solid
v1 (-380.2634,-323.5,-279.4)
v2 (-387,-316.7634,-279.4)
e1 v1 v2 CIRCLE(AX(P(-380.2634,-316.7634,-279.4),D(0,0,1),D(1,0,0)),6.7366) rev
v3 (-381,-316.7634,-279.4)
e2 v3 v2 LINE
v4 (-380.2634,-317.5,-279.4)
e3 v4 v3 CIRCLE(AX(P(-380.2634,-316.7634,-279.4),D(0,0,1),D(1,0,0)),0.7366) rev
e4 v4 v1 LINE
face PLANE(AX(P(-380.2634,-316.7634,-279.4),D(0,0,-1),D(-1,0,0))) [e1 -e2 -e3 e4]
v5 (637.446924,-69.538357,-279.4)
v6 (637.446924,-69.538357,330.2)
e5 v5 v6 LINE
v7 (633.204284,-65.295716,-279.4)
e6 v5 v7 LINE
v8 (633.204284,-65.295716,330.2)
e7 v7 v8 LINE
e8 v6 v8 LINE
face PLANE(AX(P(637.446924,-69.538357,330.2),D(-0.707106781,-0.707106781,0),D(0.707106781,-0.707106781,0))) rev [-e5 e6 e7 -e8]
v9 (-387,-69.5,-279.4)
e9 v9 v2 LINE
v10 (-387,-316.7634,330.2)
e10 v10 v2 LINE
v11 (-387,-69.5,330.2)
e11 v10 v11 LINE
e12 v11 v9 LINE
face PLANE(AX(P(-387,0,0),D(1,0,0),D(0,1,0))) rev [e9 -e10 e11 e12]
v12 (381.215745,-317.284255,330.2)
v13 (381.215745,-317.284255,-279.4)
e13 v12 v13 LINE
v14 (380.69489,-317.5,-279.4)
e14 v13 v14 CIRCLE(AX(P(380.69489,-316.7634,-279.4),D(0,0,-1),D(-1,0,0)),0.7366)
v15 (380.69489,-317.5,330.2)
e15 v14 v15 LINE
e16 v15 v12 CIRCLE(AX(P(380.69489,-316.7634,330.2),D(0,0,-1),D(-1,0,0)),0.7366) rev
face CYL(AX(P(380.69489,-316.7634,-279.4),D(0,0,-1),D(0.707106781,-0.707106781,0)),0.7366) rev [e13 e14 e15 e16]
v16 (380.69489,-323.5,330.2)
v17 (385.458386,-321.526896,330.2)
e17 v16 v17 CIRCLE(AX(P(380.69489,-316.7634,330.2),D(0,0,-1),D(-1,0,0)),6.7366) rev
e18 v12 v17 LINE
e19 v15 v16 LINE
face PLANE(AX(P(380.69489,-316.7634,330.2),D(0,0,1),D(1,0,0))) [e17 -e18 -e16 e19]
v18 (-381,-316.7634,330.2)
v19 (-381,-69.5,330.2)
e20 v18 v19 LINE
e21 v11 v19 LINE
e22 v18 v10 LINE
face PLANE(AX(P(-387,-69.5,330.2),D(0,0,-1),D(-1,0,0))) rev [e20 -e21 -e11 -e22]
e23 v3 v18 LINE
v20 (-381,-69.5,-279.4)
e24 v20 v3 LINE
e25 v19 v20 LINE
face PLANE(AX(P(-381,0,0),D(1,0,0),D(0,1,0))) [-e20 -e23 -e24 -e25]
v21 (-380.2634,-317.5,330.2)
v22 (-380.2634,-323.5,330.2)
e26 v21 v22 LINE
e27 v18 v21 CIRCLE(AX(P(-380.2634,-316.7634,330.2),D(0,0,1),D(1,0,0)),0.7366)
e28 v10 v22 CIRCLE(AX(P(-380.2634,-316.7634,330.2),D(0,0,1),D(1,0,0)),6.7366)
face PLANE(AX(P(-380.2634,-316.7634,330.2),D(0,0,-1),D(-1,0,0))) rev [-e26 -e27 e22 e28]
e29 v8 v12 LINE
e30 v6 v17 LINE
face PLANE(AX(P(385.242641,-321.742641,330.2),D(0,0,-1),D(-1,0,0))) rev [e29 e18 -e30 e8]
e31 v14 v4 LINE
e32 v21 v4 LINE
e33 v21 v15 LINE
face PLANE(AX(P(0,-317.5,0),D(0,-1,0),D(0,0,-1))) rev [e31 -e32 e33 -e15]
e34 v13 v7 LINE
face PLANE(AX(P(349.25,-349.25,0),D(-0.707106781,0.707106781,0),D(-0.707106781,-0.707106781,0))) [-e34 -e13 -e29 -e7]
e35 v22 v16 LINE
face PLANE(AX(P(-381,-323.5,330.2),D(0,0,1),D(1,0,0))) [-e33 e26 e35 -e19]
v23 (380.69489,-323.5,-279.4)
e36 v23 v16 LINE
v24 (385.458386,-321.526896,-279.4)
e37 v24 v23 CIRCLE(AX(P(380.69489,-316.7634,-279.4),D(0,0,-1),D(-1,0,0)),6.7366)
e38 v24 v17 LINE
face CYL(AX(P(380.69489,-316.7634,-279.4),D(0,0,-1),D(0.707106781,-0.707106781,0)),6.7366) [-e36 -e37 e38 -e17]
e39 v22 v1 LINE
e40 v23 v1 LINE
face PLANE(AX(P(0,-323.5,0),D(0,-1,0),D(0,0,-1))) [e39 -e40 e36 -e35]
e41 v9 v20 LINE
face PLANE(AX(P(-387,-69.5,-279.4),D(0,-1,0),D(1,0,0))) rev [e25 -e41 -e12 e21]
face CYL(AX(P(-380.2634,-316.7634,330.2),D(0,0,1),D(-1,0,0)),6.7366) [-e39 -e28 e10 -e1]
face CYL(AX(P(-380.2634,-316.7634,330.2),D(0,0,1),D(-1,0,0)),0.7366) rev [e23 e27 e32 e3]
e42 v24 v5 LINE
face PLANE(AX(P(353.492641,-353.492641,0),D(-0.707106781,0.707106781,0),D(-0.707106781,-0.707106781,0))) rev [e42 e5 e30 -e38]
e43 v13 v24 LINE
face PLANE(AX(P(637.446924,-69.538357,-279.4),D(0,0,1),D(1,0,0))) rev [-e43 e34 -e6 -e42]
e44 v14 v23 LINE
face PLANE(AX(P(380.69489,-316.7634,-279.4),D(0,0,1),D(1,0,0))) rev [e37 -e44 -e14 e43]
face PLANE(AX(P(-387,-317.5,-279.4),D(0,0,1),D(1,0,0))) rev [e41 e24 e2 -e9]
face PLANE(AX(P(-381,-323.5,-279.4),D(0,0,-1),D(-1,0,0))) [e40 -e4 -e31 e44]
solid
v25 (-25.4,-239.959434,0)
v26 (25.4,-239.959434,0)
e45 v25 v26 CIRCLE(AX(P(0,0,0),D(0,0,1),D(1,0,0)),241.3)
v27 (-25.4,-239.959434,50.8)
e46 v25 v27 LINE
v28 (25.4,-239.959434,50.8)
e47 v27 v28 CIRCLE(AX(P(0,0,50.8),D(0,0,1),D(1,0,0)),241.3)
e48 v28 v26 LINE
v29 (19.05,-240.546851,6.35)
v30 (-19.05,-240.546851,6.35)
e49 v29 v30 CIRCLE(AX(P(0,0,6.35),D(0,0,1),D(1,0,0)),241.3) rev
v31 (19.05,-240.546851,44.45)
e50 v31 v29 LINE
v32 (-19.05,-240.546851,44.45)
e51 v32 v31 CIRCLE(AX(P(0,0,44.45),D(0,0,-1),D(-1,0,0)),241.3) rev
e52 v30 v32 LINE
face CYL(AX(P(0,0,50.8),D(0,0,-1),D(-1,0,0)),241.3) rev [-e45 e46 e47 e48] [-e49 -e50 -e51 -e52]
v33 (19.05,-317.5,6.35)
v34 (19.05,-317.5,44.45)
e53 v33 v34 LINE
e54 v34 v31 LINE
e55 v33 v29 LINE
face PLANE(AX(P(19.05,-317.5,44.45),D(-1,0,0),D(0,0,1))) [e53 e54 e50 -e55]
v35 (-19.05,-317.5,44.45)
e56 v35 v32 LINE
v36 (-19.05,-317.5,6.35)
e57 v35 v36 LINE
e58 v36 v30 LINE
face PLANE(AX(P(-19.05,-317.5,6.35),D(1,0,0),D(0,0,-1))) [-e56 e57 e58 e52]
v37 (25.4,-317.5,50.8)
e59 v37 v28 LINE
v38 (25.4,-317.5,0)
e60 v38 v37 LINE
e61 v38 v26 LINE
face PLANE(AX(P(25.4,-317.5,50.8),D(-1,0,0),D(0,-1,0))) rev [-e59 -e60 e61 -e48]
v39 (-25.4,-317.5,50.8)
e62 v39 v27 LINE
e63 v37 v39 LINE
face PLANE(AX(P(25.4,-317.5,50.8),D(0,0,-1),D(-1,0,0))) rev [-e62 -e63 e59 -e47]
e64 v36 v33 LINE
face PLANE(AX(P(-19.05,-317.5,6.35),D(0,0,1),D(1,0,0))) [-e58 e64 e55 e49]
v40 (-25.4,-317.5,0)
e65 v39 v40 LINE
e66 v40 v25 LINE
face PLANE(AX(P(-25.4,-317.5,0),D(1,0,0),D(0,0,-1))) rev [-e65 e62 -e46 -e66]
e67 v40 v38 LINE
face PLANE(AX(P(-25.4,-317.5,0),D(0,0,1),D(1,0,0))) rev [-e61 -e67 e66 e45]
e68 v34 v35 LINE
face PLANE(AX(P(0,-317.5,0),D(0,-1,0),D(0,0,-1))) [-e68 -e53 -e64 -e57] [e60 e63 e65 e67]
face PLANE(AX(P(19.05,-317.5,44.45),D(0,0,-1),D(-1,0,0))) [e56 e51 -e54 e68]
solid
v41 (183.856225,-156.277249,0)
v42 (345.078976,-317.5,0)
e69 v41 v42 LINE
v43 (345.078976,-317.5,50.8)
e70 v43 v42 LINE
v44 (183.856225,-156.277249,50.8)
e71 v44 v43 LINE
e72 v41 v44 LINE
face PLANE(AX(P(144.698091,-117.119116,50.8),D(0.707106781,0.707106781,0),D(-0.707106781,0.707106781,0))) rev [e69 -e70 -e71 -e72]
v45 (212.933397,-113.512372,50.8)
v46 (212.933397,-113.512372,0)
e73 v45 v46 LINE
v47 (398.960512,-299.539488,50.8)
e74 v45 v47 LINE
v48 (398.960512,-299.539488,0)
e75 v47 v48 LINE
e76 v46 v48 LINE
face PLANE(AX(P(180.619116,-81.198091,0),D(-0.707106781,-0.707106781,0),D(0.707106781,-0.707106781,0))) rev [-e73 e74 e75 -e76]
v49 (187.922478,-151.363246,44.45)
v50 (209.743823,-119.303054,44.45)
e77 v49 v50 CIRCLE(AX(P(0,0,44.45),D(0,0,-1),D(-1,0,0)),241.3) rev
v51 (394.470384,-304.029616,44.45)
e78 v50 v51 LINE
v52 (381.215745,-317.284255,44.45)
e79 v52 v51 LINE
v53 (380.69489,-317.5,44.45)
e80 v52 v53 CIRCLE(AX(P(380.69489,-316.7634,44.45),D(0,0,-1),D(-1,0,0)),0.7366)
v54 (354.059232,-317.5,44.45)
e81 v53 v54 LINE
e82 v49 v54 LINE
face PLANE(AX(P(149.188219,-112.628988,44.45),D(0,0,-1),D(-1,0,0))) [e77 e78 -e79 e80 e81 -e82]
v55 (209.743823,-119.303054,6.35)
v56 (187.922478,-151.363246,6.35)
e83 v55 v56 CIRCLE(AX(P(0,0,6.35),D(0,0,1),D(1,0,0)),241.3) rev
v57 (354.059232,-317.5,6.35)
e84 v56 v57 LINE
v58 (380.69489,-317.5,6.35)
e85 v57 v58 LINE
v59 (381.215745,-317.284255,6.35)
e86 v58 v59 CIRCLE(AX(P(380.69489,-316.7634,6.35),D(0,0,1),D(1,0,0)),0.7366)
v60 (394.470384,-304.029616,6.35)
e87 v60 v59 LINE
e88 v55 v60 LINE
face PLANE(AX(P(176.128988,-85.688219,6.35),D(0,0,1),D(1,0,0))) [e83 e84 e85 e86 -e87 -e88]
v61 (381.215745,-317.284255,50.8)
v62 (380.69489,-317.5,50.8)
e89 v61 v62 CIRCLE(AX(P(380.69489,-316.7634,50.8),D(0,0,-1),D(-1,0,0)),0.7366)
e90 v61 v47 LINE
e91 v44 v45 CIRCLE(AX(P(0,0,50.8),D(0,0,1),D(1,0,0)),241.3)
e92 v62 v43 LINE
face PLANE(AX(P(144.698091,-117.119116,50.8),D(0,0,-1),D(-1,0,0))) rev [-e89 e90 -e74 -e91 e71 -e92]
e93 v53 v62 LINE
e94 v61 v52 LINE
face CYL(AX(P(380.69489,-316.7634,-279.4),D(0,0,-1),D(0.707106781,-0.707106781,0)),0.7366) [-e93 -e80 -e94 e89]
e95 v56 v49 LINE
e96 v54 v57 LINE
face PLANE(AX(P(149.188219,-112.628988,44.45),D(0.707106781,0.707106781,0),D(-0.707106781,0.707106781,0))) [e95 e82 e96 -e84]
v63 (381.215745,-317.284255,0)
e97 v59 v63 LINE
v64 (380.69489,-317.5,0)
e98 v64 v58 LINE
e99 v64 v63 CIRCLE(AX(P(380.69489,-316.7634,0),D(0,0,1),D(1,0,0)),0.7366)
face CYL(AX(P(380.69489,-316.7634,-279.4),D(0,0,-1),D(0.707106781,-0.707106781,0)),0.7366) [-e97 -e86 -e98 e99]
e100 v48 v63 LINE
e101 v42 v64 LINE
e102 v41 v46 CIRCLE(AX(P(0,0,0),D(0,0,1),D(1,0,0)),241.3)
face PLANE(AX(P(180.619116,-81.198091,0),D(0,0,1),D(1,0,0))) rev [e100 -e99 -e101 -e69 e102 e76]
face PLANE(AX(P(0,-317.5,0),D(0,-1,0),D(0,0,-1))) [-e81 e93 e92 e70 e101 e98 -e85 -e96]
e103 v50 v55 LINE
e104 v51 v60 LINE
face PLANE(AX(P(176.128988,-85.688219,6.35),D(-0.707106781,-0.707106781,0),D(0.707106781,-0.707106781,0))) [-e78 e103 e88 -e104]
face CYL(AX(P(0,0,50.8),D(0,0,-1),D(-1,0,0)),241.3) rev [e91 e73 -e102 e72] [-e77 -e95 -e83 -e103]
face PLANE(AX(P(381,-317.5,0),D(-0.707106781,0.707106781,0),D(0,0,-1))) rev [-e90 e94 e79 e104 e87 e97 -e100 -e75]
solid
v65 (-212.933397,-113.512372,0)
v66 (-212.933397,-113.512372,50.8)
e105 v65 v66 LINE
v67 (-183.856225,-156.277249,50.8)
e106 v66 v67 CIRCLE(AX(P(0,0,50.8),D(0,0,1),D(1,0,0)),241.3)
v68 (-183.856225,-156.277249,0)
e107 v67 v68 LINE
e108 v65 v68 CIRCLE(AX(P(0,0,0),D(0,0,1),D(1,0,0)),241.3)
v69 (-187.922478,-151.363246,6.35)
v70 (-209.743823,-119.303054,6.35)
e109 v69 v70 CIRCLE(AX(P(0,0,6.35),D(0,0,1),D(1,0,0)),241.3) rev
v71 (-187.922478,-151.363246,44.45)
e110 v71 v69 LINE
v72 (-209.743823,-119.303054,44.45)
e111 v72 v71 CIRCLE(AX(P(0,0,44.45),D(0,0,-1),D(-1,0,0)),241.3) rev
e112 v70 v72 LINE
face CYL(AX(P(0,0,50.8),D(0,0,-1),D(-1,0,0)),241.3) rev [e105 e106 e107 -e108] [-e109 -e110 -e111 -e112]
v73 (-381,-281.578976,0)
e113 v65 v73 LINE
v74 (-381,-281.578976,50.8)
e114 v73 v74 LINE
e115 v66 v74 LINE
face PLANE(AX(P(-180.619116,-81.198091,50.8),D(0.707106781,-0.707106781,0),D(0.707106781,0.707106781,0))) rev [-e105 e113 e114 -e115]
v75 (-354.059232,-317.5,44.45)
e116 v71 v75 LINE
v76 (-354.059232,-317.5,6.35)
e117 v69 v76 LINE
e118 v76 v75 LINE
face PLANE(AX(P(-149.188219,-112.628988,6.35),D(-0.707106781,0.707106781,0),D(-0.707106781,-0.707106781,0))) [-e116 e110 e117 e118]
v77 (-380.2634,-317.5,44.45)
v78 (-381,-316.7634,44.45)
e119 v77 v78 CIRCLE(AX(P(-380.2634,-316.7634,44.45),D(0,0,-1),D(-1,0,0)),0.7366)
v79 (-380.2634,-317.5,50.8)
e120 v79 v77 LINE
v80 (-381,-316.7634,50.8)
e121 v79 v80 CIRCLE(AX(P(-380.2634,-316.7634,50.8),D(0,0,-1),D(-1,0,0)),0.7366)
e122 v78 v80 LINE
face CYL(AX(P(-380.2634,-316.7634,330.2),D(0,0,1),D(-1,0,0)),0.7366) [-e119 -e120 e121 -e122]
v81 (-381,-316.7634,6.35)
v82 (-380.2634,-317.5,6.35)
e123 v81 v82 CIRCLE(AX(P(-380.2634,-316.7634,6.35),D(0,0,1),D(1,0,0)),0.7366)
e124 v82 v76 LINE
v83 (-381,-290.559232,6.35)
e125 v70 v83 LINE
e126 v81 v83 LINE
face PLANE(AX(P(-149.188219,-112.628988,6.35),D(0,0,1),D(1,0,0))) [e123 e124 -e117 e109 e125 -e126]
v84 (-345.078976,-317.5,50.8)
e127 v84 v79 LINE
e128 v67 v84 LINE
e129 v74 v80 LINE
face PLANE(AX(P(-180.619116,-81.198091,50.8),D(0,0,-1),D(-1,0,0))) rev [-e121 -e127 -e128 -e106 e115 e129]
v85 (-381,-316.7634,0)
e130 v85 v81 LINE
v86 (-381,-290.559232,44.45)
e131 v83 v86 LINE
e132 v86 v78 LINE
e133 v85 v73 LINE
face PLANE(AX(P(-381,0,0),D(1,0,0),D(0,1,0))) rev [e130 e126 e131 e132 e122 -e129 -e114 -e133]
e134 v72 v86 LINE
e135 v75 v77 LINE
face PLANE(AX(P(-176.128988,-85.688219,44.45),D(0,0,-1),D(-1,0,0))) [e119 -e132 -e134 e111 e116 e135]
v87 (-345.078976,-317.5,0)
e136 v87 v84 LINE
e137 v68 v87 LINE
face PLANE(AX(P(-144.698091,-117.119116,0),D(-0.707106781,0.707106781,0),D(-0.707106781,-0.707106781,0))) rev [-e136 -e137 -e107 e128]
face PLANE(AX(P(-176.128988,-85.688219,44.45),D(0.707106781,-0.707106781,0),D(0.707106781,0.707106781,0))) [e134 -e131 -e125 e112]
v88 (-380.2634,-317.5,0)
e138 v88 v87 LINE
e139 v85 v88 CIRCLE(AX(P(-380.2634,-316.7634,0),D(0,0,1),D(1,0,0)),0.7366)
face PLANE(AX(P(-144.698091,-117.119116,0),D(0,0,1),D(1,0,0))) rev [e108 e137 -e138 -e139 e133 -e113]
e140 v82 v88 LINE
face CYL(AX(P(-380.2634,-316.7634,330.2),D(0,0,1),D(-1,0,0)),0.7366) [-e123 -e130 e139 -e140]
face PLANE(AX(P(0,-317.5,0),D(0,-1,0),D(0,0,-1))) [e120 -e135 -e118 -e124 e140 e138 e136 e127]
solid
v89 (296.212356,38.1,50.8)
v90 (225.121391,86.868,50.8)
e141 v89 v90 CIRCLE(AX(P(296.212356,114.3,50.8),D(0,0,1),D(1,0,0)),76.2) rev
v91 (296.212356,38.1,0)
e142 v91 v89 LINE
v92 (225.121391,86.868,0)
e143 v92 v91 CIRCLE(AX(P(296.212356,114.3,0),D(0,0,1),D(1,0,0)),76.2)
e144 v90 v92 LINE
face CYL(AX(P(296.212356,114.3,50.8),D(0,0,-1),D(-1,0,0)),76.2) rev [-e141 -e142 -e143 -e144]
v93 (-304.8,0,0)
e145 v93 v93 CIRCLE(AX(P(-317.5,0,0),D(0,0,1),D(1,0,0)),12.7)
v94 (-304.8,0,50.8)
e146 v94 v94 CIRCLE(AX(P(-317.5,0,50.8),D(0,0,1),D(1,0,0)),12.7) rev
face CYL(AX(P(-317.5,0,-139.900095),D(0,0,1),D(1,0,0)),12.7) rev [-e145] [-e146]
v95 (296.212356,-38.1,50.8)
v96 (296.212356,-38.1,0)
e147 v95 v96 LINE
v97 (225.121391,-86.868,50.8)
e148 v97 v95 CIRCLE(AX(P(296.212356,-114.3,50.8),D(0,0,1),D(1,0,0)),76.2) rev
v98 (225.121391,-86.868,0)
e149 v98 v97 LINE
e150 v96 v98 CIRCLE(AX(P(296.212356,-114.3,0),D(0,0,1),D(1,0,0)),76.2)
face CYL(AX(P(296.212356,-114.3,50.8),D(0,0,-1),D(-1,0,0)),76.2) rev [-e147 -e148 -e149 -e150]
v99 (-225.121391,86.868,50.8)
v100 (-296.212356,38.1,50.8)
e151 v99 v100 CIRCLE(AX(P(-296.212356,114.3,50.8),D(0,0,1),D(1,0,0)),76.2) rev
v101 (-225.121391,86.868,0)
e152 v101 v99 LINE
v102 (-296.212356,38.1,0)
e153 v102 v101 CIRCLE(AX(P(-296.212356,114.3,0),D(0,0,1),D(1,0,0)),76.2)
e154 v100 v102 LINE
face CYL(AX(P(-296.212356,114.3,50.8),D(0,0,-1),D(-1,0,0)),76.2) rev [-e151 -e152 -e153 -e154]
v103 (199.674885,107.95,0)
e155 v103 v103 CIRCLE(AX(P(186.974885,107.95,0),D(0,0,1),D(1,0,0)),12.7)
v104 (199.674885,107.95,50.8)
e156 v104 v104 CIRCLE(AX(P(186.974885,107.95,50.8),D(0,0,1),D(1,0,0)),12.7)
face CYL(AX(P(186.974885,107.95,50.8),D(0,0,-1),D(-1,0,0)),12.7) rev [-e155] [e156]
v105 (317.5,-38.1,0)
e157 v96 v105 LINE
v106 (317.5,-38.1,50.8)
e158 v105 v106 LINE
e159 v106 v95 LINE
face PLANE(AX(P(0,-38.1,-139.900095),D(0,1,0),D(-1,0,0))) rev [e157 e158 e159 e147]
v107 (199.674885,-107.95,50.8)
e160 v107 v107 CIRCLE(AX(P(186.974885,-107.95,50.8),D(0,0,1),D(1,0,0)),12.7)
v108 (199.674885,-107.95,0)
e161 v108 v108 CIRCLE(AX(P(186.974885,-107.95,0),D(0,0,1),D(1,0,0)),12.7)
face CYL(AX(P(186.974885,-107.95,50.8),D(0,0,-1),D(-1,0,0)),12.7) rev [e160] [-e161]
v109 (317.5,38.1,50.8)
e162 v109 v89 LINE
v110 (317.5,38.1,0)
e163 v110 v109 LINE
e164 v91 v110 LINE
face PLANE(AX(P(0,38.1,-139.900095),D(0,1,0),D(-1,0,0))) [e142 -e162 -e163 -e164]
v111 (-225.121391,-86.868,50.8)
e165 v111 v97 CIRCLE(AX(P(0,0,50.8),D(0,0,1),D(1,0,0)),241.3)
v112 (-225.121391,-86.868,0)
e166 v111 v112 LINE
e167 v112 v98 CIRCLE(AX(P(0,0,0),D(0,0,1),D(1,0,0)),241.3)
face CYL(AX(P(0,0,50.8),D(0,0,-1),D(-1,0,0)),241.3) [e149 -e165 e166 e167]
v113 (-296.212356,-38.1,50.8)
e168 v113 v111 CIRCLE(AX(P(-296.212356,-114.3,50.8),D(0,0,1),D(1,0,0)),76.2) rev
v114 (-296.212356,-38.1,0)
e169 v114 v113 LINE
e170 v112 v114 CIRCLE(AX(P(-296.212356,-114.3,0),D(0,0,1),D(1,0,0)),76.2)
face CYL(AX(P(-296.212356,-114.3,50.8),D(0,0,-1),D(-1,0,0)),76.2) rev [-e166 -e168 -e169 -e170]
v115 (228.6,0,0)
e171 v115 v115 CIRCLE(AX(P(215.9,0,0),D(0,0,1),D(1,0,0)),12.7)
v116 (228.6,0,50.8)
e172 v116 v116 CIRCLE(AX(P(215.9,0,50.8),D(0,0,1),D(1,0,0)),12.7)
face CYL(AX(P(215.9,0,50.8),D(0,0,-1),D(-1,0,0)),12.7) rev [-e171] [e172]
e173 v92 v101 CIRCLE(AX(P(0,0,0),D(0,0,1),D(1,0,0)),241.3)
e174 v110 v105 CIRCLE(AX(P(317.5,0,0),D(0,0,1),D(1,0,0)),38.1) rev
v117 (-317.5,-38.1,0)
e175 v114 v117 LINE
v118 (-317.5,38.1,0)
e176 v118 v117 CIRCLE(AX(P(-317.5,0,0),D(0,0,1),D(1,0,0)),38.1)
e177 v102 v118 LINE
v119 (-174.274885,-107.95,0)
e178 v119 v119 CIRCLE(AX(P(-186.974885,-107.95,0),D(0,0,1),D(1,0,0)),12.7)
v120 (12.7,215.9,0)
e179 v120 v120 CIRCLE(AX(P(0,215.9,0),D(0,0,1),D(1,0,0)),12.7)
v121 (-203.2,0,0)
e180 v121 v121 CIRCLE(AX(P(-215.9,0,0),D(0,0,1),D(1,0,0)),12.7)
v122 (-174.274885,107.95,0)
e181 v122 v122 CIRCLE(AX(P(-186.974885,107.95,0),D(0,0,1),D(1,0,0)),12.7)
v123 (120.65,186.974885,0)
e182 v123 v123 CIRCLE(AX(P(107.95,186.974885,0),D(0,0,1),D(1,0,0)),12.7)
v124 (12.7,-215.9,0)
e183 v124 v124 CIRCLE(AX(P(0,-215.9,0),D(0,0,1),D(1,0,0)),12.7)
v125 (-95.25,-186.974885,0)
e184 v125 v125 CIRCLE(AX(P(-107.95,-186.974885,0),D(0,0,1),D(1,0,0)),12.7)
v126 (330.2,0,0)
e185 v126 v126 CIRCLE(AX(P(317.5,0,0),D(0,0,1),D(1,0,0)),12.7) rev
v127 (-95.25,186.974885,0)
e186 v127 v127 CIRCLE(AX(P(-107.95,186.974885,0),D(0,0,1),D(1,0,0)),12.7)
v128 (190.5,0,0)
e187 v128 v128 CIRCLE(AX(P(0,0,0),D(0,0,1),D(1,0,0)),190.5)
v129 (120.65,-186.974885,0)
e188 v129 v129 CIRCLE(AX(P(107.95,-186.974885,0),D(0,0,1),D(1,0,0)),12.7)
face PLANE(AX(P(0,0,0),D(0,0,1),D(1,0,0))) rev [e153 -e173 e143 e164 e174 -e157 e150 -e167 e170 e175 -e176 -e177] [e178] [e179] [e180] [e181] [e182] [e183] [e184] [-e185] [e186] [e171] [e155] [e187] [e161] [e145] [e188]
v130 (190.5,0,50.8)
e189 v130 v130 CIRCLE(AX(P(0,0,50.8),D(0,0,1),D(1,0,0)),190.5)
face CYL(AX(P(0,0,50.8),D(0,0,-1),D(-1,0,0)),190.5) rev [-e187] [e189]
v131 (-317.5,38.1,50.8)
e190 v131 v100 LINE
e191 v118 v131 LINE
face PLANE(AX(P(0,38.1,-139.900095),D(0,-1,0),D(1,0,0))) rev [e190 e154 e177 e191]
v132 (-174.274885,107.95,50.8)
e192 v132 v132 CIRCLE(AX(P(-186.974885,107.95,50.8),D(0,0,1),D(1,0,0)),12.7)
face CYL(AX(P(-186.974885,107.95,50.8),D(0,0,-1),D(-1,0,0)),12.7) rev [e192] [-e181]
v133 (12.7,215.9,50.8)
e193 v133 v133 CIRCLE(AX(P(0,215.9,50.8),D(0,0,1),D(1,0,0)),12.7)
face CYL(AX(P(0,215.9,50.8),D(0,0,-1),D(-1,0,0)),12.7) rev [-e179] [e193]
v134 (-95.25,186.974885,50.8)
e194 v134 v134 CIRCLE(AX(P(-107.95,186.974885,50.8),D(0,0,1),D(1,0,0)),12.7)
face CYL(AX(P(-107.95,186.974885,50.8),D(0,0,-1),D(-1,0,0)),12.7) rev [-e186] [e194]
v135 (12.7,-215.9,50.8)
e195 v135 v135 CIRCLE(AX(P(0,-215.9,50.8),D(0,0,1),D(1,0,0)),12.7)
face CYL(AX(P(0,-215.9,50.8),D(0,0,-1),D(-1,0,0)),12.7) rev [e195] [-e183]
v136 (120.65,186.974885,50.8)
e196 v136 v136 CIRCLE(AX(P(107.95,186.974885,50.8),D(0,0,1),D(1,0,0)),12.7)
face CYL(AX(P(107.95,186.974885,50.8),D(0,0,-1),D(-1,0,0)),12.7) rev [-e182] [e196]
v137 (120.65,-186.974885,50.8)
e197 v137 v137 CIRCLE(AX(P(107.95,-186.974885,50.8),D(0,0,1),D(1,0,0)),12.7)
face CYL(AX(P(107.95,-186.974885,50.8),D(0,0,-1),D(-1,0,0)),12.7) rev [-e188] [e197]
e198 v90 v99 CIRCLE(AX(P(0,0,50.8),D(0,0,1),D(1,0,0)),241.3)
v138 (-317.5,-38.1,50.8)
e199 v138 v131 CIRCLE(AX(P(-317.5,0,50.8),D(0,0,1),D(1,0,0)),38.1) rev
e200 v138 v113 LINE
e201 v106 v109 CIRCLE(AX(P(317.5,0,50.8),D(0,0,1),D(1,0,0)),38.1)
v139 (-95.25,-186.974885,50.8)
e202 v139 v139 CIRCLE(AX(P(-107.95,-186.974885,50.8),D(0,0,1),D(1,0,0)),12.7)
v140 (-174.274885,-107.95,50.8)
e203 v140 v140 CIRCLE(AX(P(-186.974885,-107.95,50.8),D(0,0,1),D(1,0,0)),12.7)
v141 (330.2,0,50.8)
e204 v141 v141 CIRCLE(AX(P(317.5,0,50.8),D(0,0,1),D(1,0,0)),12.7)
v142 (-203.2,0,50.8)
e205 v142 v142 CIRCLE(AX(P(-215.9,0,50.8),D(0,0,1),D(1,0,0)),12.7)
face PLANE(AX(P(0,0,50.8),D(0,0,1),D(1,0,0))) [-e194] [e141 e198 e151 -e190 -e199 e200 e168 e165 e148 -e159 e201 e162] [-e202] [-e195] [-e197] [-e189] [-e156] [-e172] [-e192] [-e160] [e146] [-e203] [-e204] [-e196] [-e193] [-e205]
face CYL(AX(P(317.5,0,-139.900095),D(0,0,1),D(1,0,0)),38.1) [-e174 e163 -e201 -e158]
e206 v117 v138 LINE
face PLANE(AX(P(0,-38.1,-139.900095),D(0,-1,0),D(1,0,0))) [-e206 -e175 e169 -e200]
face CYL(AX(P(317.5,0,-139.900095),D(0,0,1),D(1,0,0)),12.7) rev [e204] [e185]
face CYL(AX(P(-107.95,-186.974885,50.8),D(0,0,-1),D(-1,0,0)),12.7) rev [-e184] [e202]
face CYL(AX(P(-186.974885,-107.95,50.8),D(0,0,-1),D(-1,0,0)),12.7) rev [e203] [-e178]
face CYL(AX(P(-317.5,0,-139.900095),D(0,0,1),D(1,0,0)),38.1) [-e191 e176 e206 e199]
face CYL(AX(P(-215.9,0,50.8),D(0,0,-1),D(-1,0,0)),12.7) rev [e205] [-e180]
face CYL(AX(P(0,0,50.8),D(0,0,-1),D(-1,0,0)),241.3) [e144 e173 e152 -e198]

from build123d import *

# Parameters (mm, degrees)
SKETCH1_R                                      = 241.3
SKETCH1_R_2                                    = 190.5
SKETCH1_R_3                                    = 12.7
BOSS_EXTRUDE1_DEPTH                            = 50.8
SKETCH18_W                                     = 50.8
SKETCH18_H                                     = 50.8
SKETCH18_W_2                                   = 38.1
SKETCH18_H_2                                   = 38.1
AL_TUBE_SQUARE_AL_TUBE_2_SQR_X_0_25_WALL_DEPTH = 127
SKETCH18_ON_SEGMENT_2_W                        = 50.8
SKETCH18_ON_SEGMENT_2_H                        = 50.8
SKETCH18_ON_SEGMENT_2_W_2                      = 38.1
SKETCH18_ON_SEGMENT_2_H_2                      = 38.1
AL_TUBE_SQUARE_AL_TUBE_2_SQR_X_0_25_2_DEPTH    = 308.781363997
SKETCH18_ON_SEGMENT_3_W                        = 50.8
SKETCH18_ON_SEGMENT_3_H                        = 50.8
SKETCH18_ON_SEGMENT_3_W_2                      = 38.1
SKETCH18_ON_SEGMENT_3_H_2                      = 38.1
AL_TUBE_SQUARE_AL_TUBE_2_SQR_X_0_25_3_DEPTH    = 308.781363997
INDENT1_DEPTH                                  = 50.8
INDENT1_2_DEPTH                                = 50.8
INDENT1_3_DEPTH                                = 6.35
INDENT1_START                                  = 44.45
INDENT1_4_DEPTH                                = 6.35
INDENT1_5_OUTLINE_R                            = 12.7
INDENT1_5_DEPTH                                = 6.35
INDENT1_6_OUTLINE_R                            = 12.7
INDENT1_6_DEPTH                                = 6.35
INDENT1_START_2                                = 6.35
INDENT1_7_DEPTH                                = 38.1
INDENT2_DEPTH                                  = 50.8
INDENT2_START                                  = 44.45
INDENT2_2_OUTLINE_R                            = 12.7
INDENT2_2_DEPTH                                = 6.35
INDENT2_3_OUTLINE_R                            = 12.7
INDENT2_3_DEPTH                                = 6.35
INDENT3_DEPTH                                  = 50.8
INDENT3_2_OUTLINE_R                            = 12.7
INDENT3_2_DEPTH                                = 6.35
INDENT3_START                                  = 44.45
INDENT3_3_OUTLINE_R                            = 12.7
INDENT3_3_DEPTH                                = 6.35
INDENT3_START_2                                = 6.35
INDENT3_4_DEPTH                                = 38.1
INDENT3_5_DEPTH                                = 50.8
INDENT3_6_DEPTH                                = 6.35
INDENT3_7_DEPTH                                = 6.35
SKETCH19_W                                     = 762
SKETCH19_H                                     = 609.6
BASE_FLANGE1_DEPTH                             = 6
EDGE_FLANGE1_STRIP_CUT_DEPTH                   = 609.6
EDGE_FLANGE1_DEPTH                             = 609.6
EDGE_FLANGE2_STRIP_W                           = 25.4732
EDGE_FLANGE2_STRIP_H                           = 6
EDGE_FLANGE2_STRIP_CUT_DEPTH                   = 609.6
EDGE_FLANGE2_DEPTH                             = 609.6
INDENT4_DEPTH                                  = 50.8
INDENT4_2_DEPTH                                = 50.8
INDENT4_3_DEPTH                                = 6.35
INDENT4_START                                  = 44.45
INDENT4_4_DEPTH                                = 6.35
INDENT5_DEPTH                                  = 50.8
INDENT5_2_DEPTH                                = 50.8
INDENT5_3_DEPTH                                = 6.35
INDENT5_START                                  = 44.45
INDENT5_4_DEPTH                                = 6.35
INDENT5_5_DEPTH                                = 50.8
INDENT5_6_DEPTH                                = 6.35
INDENT5_7_DEPTH                                = 6.35
BOSS_EXTRUDE2_START                            = -50.8
SKETCH30_R                                     = 38.1
SKETCH30_R_2                                   = 12.7
BOSS_EXTRUDE2_DEPTH                            = 50.8
FILLET1_R                                      = 76.2


# Read off the part's stored shape, not the designer's step: Indent1, Indent2, Indent3, Indent4, Indent5
# Sheet-metal steps are written as plain solids
with BuildPart() as part:
    # Sketch1 → Boss-Extrude1 (new body)
    with BuildSketch(Plane.XY):
        Circle(SKETCH1_R)
        Circle(SKETCH1_R_2, mode=Mode.SUBTRACT)
        with Locations((0, 215.9)):
            Circle(SKETCH1_R_3, mode=Mode.SUBTRACT)
        with Locations((107.95, 186.974884677)):
            Circle(SKETCH1_R_3, mode=Mode.SUBTRACT)
        with Locations((186.974884677, 107.95)):
            Circle(SKETCH1_R_3, mode=Mode.SUBTRACT)
        with Locations((215.9, 0)):
            Circle(SKETCH1_R_3, mode=Mode.SUBTRACT)
        with Locations((186.974884677, -107.95)):
            Circle(SKETCH1_R_3, mode=Mode.SUBTRACT)
        with Locations((107.95, -186.974884677)):
            Circle(SKETCH1_R_3, mode=Mode.SUBTRACT)
        with Locations((0, -215.9)):
            Circle(SKETCH1_R_3, mode=Mode.SUBTRACT)
        with Locations((-107.95, -186.974884677)):
            Circle(SKETCH1_R_3, mode=Mode.SUBTRACT)
        with Locations((-186.974884677, -107.95)):
            Circle(SKETCH1_R_3, mode=Mode.SUBTRACT)
        with Locations((-215.9, 0)):
            Circle(SKETCH1_R_3, mode=Mode.SUBTRACT)
        with Locations((-186.974884677, 107.95)):
            Circle(SKETCH1_R_3, mode=Mode.SUBTRACT)
        with Locations((-107.95, 186.974884677)):
            Circle(SKETCH1_R_3, mode=Mode.SUBTRACT)
    extrude(amount=BOSS_EXTRUDE1_DEPTH)

    # Sketch30 → Boss-Extrude2 (add)
    # profile 1 of 4: a face of its own
    with BuildSketch(Plane.XY.offset(50.8).offset(BOSS_EXTRUDE2_START)):
        with BuildLine():
            ThreePointArc((-238.273120599, -38.1), (-241.3, 0), (-238.273120599, 38.1))
            Line((-238.273120599, 38.1), (-317.5, 38.1))
            ThreePointArc((-317.5, 38.1), (-290.559231637, 26.940768363), (-279.4, 0))
            ThreePointArc((-279.4, 0), (-290.559231637, -26.940768363), (-317.5, -38.1))
            Line((-317.5, -38.1), (-238.273120599, -38.1))
        make_face()
    # profile 2 of 4: a face of its own
    with BuildSketch(Plane.XY.offset(50.8).offset(BOSS_EXTRUDE2_START)):
        with Locations((-317.5, 0)):
            Circle(SKETCH30_R)
        with Locations((-317.5, 0)):
            Circle(SKETCH30_R_2, mode=Mode.SUBTRACT)
    # profile 3 of 4: a face of its own
    with BuildSketch(Plane.XY.offset(50.8).offset(BOSS_EXTRUDE2_START)):
        with BuildLine():
            ThreePointArc((317.5, -38.1), (279.4, 0), (317.5, 38.1))
            Line((317.5, 38.1), (238.273120599, 38.1))
            ThreePointArc((238.273120599, 38.1), (240.542089873, 19.110023541), (241.3, 0))
            ThreePointArc((241.3, 0), (240.542089873, -19.110023541), (238.273120599, -38.1))
            Line((238.273120599, -38.1), (317.5, -38.1))
        make_face()
    # profile 4 of 4: a face of its own
    with BuildSketch(Plane.XY.offset(50.8).offset(BOSS_EXTRUDE2_START)):
        with Locations((317.5, 0)):
            Circle(SKETCH30_R)
        with Locations((317.5, 0)):
            Circle(SKETCH30_R_2, mode=Mode.SUBTRACT)
    extrude(amount=BOSS_EXTRUDE2_DEPTH)

    # Fillet1
    fillet1_edges = [part.edges().sort_by_distance(p)[0] for p in [
        (-238.273120599, 38.1, 25.4),
        (-238.273120599, -38.1, 25.4),
        (238.273120599, 38.1, 25.4),
        (238.273120599, -38.1, 25.4),
    ]]
    fillet(fillet1_edges, radius=FILLET1_R)


with BuildPart() as body_2:
    # Sketch18 → Al tube square AL TUBE 2 SQR X 0.25 WALL(1) (new body)
    with BuildSketch(Plane(origin=(0, -190.5, 25.4), x_dir=(-1, 0, 0), z_dir=(0, -1, 0))):
        Rectangle(SKETCH18_W, SKETCH18_H)
        Rectangle(SKETCH18_W_2, SKETCH18_H_2, mode=Mode.SUBTRACT)
    extrude(amount=AL_TUBE_SQUARE_AL_TUBE_2_SQR_X_0_25_WALL_DEPTH)

    # Indent2 outline → Indent2 (cut)
    with BuildSketch(Plane.XY):
        with BuildLine():
            Line((25.4, -239.959434072), (25.4, -190.5))
            Line((25.4, -190.5), (-25.4, -190.5))
            Line((-25.4, -190.5), (-25.4, -239.959434072))
            ThreePointArc((-25.4, -239.959434072), (0, -241.3), (25.4, -239.959434072))
        make_face()
    extrude(amount=INDENT2_DEPTH, mode=Mode.SUBTRACT)


with BuildPart() as body_3:
    # Sketch18 on segment 2 (carried to segment 2) → Al tube square AL TUBE 2 SQR X 0.25  2 (new body)
    with BuildSketch(Plane(origin=(381, -317.5, 25.4), x_dir=(0.707106781, 0.707106781, 0), z_dir=(-0.707106781, 0.707106781, 0))):
        Rectangle(SKETCH18_ON_SEGMENT_2_W, SKETCH18_ON_SEGMENT_2_H)
        Rectangle(SKETCH18_ON_SEGMENT_2_W_2, SKETCH18_ON_SEGMENT_2_H_2, mode=Mode.SUBTRACT)
    extrude(amount=AL_TUBE_SQUARE_AL_TUBE_2_SQR_X_0_25_2_DEPTH)

    # Indent1 outline → Indent1 (cut)
    with BuildSketch(Plane.XY):
        with BuildLine():
            Line((212.933396583, -113.512372099), (180.619115855, -81.198091371))
            Line((180.619115855, -81.198091371), (144.698091371, -117.119115855))
            Line((144.698091371, -117.119115855), (183.856224739, -156.277249223))
            ThreePointArc((183.856224739, -156.277249223), (199.543753538, -135.676012706), (212.933396583, -113.512372099))
        make_face()
    extrude(amount=INDENT1_DEPTH, mode=Mode.SUBTRACT)

    # Indent4 outline → Indent4 (cut)
    with BuildSketch(Plane.XY):
        with BuildLine():
            ThreePointArc((381.215745145, -317.284254855), (380.976774906, -317.443929664), (380.69489029, -317.5))
            Line((380.69489029, -317.5), (345.078975516, -317.5))
            Line((345.078975516, -317.5), (363.039487758, -335.460512242))
            Line((363.039487758, -335.460512242), (381.215745145, -317.284254855))
        make_face()
    extrude(amount=INDENT4_DEPTH, mode=Mode.SUBTRACT)


with BuildPart() as body_4:
    # Sketch18 on segment 3 (carried to segment 3) → Al tube square AL TUBE 2 SQR X 0.25  3 (new body)
    with BuildSketch(Plane(origin=(-381, -317.5, 25.4), x_dir=(0.707106781, -0.707106781, 0), z_dir=(0.707106781, 0.707106781, 0))):
        Rectangle(SKETCH18_ON_SEGMENT_3_W, SKETCH18_ON_SEGMENT_3_H)
        Rectangle(SKETCH18_ON_SEGMENT_3_W_2, SKETCH18_ON_SEGMENT_3_H_2, mode=Mode.SUBTRACT)
    extrude(amount=AL_TUBE_SQUARE_AL_TUBE_2_SQR_X_0_25_3_DEPTH)

    # Indent3 outline → Indent3 (cut)
    with BuildSketch(Plane.XY):
        with BuildLine():
            Line((-183.856224739, -156.277249223), (-144.698091371, -117.119115856))
            Line((-144.698091371, -117.119115856), (-180.619115855, -81.198091371))
            Line((-180.619115855, -81.198091371), (-212.933396583, -113.512372099))
            ThreePointArc((-212.933396583, -113.512372099), (-199.543753538, -135.676012706), (-183.856224739, -156.277249223))
        make_face()
    extrude(amount=INDENT3_DEPTH, mode=Mode.SUBTRACT)

    # Indent5 outline → Indent5 (cut)
    with BuildSketch(Plane.XY):
        with BuildLine():
            ThreePointArc((-380.2634, -317.5), (-380.784254855, -317.284254855), (-381, -316.7634))
            Line((-381, -316.7634), (-381, -281.578975516))
            Line((-381, -281.578975516), (-398.960512242, -299.539487758))
            Line((-398.960512242, -299.539487758), (-363.039487758, -335.460512242))
            Line((-363.039487758, -335.460512242), (-345.078975516, -317.5))
            Line((-345.078975516, -317.5), (-380.2634, -317.5))
        make_face()
    extrude(amount=INDENT5_DEPTH, mode=Mode.SUBTRACT)


with BuildPart() as body_5:
    # Indent1 2 outline → Indent1 2 (new body)
    with BuildSketch(Plane.XY):
        with BuildLine():
            Line((151.737401824, -115.178170187), (149.188219432, -112.628987795))
            Line((149.188219432, -112.628987795), (144.698091371, -117.119115855))
            Line((144.698091371, -117.119115855), (147.785663179, -120.206687663))
            ThreePointArc((147.785663179, -120.206687663), (149.782636224, -117.709013613), (151.737401824, -115.178170187))
        make_face()
    extrude(amount=INDENT1_2_DEPTH)

    # Indent1 3 outline → Indent1 3 (add)
    with BuildSketch(Plane.XY):
        with BuildLine():
            ThreePointArc((151.737401824, -115.178170187), (157.401933555, -107.307414995), (162.658603613, -99.158603613))
            Line((162.658603613, -99.158603613), (149.188219432, -112.628987795))
            Line((149.188219432, -112.628987795), (151.737401824, -115.178170187))
        make_face()
    extrude(amount=INDENT1_3_DEPTH)

    # Indent1 4 outline → Indent1 4 (add)
    with BuildSketch(Plane.XY.offset(INDENT1_START)):
        with BuildLine():
            ThreePointArc((151.737401824, -115.178170187), (157.401933555, -107.307414995), (162.658603613, -99.158603613))
            Line((162.658603613, -99.158603613), (149.188219432, -112.628987795))
            Line((149.188219432, -112.628987795), (151.737401824, -115.178170187))
        make_face()
    extrude(amount=INDENT1_4_DEPTH)


with BuildPart() as body_6:
    # Indent1 5 outline → Indent1 5 (new body)
    with BuildSketch(Plane.XY):
        with Locations((186.974884677, -107.95)):
            Circle(INDENT1_5_OUTLINE_R)
    extrude(amount=INDENT1_5_DEPTH)

    # Indent1 6 outline → Indent1 6 (add)
    with BuildSketch(Plane.XY.offset(INDENT1_START)):
        with Locations((186.974884677, -107.95)):
            Circle(INDENT1_6_OUTLINE_R)
    extrude(amount=INDENT1_6_DEPTH)

    # Indent1 7 outline → Indent1 7 (add)
    with BuildSketch(Plane.XY.offset(INDENT1_START_2)):
        with BuildLine():
            ThreePointArc((199.615675856, -109.174907493), (195.955140798, -98.969743879), (185.749977184, -95.309208821))
            Line((185.749977184, -95.309208821), (199.615675856, -109.174907493))
        make_face()
    extrude(amount=INDENT1_7_DEPTH)


with BuildPart() as body_5_2:
    # Indent2 2 outline → Indent2 2 (new body)
    with BuildSketch(Plane.XY.offset(INDENT2_START)):
        with Locations((0, -215.9)):
            Circle(INDENT2_2_OUTLINE_R)
    extrude(amount=INDENT2_2_DEPTH)


with BuildPart() as body_6_2:
    # Indent2 3 outline → Indent2 3 (new body)
    with BuildSketch(Plane.XY):
        with Locations((0, -215.9)):
            Circle(INDENT2_3_OUTLINE_R)
    extrude(amount=INDENT2_3_DEPTH)


with BuildPart() as body_5_3:
    # Indent3 2 outline → Indent3 2 (new body)
    with BuildSketch(Plane.XY):
        with Locations((-186.974884677, -107.95)):
            Circle(INDENT3_2_OUTLINE_R)
    extrude(amount=INDENT3_2_DEPTH)

    # Indent3 3 outline → Indent3 3 (add)
    with BuildSketch(Plane.XY.offset(INDENT3_START)):
        with Locations((-186.974884677, -107.95)):
            Circle(INDENT3_3_OUTLINE_R)
    extrude(amount=INDENT3_3_DEPTH)

    # Indent3 4 outline → Indent3 4 (add)
    with BuildSketch(Plane.XY.offset(INDENT3_START_2)):
        with BuildLine():
            Line((-199.615675856, -109.174907493), (-185.749977184, -95.309208821))
            ThreePointArc((-185.749977184, -95.309208821), (-195.955140798, -98.969743879), (-199.615675856, -109.174907493))
        make_face()
    extrude(amount=INDENT3_4_DEPTH)


with BuildPart() as body_6_3:
    # Indent3 5 outline → Indent3 5 (new body)
    with BuildSketch(Plane.XY):
        with BuildLine():
            Line((-147.785663179, -120.206687663), (-144.698091371, -117.119115856))
            Line((-144.698091371, -117.119115856), (-149.188219432, -112.628987795))
            Line((-149.188219432, -112.628987795), (-151.737401824, -115.178170187))
            ThreePointArc((-151.737401824, -115.178170187), (-149.782636224, -117.709013613), (-147.785663179, -120.206687663))
        make_face()
    extrude(amount=INDENT3_5_DEPTH)

    # Indent3 6 outline → Indent3 6 (add)
    with BuildSketch(Plane.XY):
        with BuildLine():
            Line((-151.737401824, -115.178170187), (-149.188219432, -112.628987795))
            Line((-149.188219432, -112.628987795), (-162.658603613, -99.158603613))
            ThreePointArc((-162.658603613, -99.158603613), (-157.401933555, -107.307414995), (-151.737401824, -115.178170187))
        make_face()
    extrude(amount=INDENT3_6_DEPTH)

    # Indent3 7 outline → Indent3 7 (add)
    with BuildSketch(Plane.XY.offset(INDENT3_START)):
        with BuildLine():
            Line((-151.737401824, -115.178170187), (-149.188219432, -112.628987795))
            Line((-149.188219432, -112.628987795), (-162.658603613, -99.158603613))
            ThreePointArc((-162.658603613, -99.158603613), (-157.401933555, -107.307414995), (-151.737401824, -115.178170187))
        make_face()
    extrude(amount=INDENT3_7_DEPTH)


with BuildPart() as body_5_4:
    # Sketch19 → Base-Flange1 (new body)
    with BuildSketch(Plane(origin=(0, -317.5, 0), x_dir=(1, 0, 0), z_dir=(0, 1, 0))):
        with Locations((0, -25.4)):
            Rectangle(SKETCH19_W, SKETCH19_H)
    extrude(amount=-BASE_FLANGE1_DEPTH)

    # Edge-Flange1 strip (across the edge) → Edge-Flange1 strip cut (cut)
    with BuildSketch(Plane(origin=(381, -317.5, 330.2), x_dir=(-0.7071067811865438, 0.7071067811865512, 0), z_dir=(0, 0, -1))):
        Polygon((-22.039168001, 13.553886626), (-4.026895542, -4.458385832), (0.215745145, -0.215745145), (-17.796527314, 17.796527314), align=None)
    extrude(amount=EDGE_FLANGE1_STRIP_CUT_DEPTH, mode=Mode.SUBTRACT)

    # Edge-Flange1 section (across the edge) → Edge-Flange1 (add)
    with BuildSketch(Plane(origin=(381, -317.5, 330.2), x_dir=(-0.7071067811865438, 0.7071067811865512, 0), z_dir=(0, 0, -1))):
        with BuildLine():
            Line((-6, 0.30510971), (-6, 356.670718626))
            Line((-6, 356.670718626), (0, 356.670718626))
            Line((0, 356.670718626), (0, 0.30510971))
            ThreePointArc((0, 0.30510971), (0.056070336, 0.023225094), (0.215745145, -0.215745145))
            Line((0.215745145, -0.215745145), (-4.026895542, -4.458385832))
            ThreePointArc((-4.026895542, -4.458385832), (-5.487206859, -2.2728755), (-6, 0.30510971))
        make_face()
    extrude(amount=EDGE_FLANGE1_DEPTH)

    # Edge-Flange2 strip (across the edge) → Edge-Flange2 strip cut (cut)
    with BuildSketch(Plane(origin=(-381, -317.5, -279.4), x_dir=(1, 0, 0), z_dir=(0, 0, 1))):
        with Locations((-12, -3)):
            Rectangle(EDGE_FLANGE2_STRIP_W, EDGE_FLANGE2_STRIP_H)
    extrude(amount=EDGE_FLANGE2_STRIP_CUT_DEPTH, mode=Mode.SUBTRACT)

    # Edge-Flange2 section (across the edge) → Edge-Flange2 (add)
    with BuildSketch(Plane(origin=(-381, -317.5, -279.4), x_dir=(1, 0, 0), z_dir=(0, 0, 1))):
        with BuildLine():
            Line((-6, 0.7366), (-6, 248))
            Line((-6, 248), (0, 248))
            Line((0, 248), (0, 0.7366))
            ThreePointArc((0, 0.7366), (0.215745145, 0.215745145), (0.7366, 0))
            Line((0.7366, 0), (0.7366, -6))
            ThreePointArc((0.7366, -6), (-4.026895542, -4.026895542), (-6, 0.7366))
        make_face()
    extrude(amount=EDGE_FLANGE2_DEPTH)


with BuildPart() as body_6_4:
    # Indent4 2 outline → Indent4 2 (new body)
    with BuildSketch(Plane.XY):
        Polygon((363.039487758, -335.460512242), (367.529615818, -330.970384182), (360.059231637, -323.5), (351.078975516, -323.5), align=None)
    extrude(amount=INDENT4_2_DEPTH)

    # Indent4 3 outline → Indent4 3 (add)
    with BuildSketch(Plane.XY):
        Polygon((367.529615818, -330.970384182), (375, -323.5), (360.059231637, -323.5), align=None)
    extrude(amount=INDENT4_3_DEPTH)

    # Indent4 4 outline → Indent4 4 (add)
    with BuildSketch(Plane.XY.offset(INDENT4_START)):
        Polygon((367.529615818, -330.970384182), (375, -323.5), (360.059231637, -323.5), align=None)
    extrude(amount=INDENT4_4_DEPTH)


with BuildPart() as body_6_5:
    # Indent5 2 outline → Indent5 2 (new body)
    with BuildSketch(Plane.XY):
        Polygon((-367.529615818, -330.970384182), (-363.039487758, -335.460512242), (-351.078975516, -323.5), (-360.059231637, -323.5), align=None)
    extrude(amount=INDENT5_2_DEPTH)

    # Indent5 3 outline → Indent5 3 (add)
    with BuildSketch(Plane.XY):
        Polygon((-375, -323.5), (-367.529615818, -330.970384182), (-360.059231637, -323.5), align=None)
    extrude(amount=INDENT5_3_DEPTH)

    # Indent5 4 outline → Indent5 4 (add)
    with BuildSketch(Plane.XY.offset(INDENT5_START)):
        Polygon((-375, -323.5), (-367.529615818, -330.970384182), (-360.059231637, -323.5), align=None)
    extrude(amount=INDENT5_4_DEPTH)


with BuildPart() as body_7:
    # Indent5 5 outline → Indent5 5 (new body)
    with BuildSketch(Plane.XY):
        Polygon((-398.960512242, -299.539487758), (-394.470384182, -304.029615818), (-387, -296.559231637), (-387, -287.578975516), align=None)
    extrude(amount=INDENT5_5_DEPTH)

    # Indent5 6 outline → Indent5 6 (add)
    with BuildSketch(Plane.XY):
        Polygon((-394.470384182, -304.029615818), (-387, -311.5), (-387, -296.559231637), align=None)
    extrude(amount=INDENT5_6_DEPTH)

    # Indent5 7 outline → Indent5 7 (add)
    with BuildSketch(Plane.XY.offset(INDENT5_START)):
        Polygon((-394.470384182, -304.029615818), (-387, -311.5), (-387, -296.559231637), align=None)
    extrude(amount=INDENT5_7_DEPTH)


solid = Compound([part.part, body_2.part, body_3.part, body_4.part, body_5_4.part])
